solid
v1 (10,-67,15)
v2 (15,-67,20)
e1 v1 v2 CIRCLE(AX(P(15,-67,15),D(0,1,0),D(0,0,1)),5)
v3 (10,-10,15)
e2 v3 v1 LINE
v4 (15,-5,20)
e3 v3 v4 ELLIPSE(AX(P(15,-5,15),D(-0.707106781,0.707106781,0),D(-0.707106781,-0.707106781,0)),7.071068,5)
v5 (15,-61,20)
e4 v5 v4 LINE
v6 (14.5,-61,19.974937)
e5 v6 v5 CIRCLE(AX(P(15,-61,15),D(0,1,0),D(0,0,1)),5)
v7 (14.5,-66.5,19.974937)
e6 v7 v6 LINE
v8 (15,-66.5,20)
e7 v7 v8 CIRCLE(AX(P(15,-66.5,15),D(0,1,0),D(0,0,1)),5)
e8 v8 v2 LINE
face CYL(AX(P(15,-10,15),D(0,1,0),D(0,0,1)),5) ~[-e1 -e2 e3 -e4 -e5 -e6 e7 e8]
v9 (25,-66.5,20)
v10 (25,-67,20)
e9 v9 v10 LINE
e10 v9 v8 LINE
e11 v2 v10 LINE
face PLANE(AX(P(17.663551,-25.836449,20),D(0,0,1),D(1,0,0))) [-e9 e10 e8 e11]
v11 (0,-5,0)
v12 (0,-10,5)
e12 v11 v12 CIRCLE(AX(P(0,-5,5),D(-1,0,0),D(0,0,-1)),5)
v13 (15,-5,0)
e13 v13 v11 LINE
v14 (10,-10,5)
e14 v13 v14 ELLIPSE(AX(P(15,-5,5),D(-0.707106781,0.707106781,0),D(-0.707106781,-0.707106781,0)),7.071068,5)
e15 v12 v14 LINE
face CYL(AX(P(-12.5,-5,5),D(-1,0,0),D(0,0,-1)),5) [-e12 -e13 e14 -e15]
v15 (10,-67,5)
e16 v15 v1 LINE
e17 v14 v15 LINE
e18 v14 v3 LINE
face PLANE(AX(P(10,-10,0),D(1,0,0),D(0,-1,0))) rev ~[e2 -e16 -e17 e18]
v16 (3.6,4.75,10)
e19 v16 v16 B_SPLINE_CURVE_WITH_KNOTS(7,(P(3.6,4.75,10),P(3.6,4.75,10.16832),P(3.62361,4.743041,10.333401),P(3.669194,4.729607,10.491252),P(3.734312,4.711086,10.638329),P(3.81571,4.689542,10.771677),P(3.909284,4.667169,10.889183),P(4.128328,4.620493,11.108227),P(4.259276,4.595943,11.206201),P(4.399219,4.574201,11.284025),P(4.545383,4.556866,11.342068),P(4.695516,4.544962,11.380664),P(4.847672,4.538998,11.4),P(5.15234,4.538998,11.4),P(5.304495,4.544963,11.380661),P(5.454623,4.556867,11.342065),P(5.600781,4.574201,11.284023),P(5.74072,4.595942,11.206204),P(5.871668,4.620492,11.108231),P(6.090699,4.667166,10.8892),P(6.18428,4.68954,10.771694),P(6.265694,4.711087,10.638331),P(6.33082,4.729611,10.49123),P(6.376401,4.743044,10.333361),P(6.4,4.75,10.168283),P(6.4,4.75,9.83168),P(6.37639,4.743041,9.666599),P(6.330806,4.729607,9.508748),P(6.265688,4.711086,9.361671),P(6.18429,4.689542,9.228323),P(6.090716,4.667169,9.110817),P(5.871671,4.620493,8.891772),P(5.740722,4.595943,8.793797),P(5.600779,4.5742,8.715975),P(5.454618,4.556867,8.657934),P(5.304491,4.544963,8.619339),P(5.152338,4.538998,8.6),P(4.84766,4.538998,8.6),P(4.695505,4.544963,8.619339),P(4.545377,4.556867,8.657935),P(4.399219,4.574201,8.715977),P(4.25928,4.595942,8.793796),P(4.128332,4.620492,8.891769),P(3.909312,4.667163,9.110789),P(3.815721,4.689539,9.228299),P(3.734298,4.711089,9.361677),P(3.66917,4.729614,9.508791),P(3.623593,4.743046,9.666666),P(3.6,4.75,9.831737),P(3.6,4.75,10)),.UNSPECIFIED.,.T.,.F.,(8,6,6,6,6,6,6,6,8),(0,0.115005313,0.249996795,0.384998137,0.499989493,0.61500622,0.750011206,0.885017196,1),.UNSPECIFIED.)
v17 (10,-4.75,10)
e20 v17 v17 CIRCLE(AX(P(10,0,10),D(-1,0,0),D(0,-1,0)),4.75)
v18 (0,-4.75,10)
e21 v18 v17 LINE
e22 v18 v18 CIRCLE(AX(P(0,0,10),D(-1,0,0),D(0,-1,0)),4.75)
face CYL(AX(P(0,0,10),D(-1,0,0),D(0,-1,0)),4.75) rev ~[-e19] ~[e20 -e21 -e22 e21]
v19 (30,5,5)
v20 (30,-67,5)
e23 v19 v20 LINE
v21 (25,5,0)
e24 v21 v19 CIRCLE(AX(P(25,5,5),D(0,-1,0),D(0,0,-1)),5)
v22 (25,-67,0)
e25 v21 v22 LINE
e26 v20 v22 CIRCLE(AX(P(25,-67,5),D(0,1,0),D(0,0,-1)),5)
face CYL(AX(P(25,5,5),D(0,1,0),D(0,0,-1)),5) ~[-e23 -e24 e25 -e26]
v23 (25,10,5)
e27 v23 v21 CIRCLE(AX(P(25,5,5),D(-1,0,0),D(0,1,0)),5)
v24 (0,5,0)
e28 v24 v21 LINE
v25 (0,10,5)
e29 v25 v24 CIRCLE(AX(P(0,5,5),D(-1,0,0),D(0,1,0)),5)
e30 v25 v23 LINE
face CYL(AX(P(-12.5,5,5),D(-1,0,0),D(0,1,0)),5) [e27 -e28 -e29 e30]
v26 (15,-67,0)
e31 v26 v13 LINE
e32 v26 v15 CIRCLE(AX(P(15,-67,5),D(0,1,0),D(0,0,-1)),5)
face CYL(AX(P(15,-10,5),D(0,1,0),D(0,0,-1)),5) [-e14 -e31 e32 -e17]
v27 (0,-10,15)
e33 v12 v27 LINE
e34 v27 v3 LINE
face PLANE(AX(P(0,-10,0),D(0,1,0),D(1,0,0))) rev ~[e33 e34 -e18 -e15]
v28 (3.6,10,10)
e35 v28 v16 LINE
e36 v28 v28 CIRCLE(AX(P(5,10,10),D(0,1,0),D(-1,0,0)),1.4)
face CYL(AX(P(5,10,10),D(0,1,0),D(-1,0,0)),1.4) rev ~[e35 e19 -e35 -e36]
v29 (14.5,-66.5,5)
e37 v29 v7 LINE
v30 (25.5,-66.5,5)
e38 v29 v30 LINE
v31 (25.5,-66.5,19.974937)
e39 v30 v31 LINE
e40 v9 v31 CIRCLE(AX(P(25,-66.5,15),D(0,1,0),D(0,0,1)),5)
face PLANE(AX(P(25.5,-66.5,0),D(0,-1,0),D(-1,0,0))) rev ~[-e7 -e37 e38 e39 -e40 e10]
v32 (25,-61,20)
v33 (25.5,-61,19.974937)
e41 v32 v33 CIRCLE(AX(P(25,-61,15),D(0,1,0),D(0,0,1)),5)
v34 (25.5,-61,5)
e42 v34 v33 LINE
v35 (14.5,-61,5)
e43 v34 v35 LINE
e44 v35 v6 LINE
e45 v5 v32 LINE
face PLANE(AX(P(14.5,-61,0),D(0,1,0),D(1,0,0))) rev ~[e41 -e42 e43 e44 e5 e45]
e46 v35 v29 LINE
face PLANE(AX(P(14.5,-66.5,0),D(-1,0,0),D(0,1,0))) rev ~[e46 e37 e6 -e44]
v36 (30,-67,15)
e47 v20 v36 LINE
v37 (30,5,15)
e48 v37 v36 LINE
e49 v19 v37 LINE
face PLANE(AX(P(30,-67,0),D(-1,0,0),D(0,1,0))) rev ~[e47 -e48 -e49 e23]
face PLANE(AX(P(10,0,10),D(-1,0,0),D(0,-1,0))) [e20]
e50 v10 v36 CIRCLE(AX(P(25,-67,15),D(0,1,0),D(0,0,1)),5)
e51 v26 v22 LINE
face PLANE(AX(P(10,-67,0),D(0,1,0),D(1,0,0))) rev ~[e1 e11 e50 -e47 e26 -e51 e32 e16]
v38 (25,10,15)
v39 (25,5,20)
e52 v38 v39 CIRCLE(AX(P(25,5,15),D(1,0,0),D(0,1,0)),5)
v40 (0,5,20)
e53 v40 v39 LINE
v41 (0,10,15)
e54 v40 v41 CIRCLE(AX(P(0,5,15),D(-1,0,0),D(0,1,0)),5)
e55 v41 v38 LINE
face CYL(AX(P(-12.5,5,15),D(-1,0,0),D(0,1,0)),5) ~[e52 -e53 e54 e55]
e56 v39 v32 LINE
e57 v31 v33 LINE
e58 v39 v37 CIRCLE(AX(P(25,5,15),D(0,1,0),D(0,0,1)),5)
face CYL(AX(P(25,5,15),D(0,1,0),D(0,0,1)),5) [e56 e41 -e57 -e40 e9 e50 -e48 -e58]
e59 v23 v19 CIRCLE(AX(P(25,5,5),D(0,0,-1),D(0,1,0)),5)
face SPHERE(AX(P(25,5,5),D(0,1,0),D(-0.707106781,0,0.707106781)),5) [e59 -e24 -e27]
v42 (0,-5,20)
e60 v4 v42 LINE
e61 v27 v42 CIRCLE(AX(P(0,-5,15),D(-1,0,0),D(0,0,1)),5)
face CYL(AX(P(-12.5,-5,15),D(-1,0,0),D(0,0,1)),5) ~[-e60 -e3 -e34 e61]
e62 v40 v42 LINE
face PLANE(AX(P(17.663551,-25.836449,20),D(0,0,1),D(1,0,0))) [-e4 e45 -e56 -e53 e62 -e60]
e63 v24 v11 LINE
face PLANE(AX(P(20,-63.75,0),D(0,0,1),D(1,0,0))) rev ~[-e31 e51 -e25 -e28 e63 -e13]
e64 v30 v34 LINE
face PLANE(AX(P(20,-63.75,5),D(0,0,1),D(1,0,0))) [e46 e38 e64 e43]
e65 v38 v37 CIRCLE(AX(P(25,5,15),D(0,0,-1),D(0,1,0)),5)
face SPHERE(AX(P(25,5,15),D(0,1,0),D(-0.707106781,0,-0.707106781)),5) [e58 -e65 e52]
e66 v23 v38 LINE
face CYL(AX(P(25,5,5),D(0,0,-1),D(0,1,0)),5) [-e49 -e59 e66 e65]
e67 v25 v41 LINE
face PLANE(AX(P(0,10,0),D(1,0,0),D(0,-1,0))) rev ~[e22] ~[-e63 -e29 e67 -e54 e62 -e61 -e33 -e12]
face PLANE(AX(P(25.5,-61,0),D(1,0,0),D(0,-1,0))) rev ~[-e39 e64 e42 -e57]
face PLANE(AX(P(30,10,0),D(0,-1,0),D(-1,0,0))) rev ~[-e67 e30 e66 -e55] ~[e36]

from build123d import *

# Parameters (mm, degrees)
F1_DEPTH     = 20
F2_DEPTH     = 5
F3_R         = 4.75
F4_DEPTH     = 10
F5_R         = 1.4
F6_DEPTH     = 5.4620024133
F7_T1_DEPTH  = 37.5
F7_T3_DEPTH  = 22.5
F7_T5_DEPTH  = 69.5
F7_T7_DEPTH  = 84.5
F7_T9_DEPTH  = 10
F7_S13_W     = 5
F7_S13_H     = 5
F7_T14_DEPTH = 5
F7_S19_W     = 5
F7_S19_H     = 5
F7_T20_DEPTH = 5
F7_T27_DEPTH = 35
F7_T31_DEPTH = 82
F7_T38_DEPTH = 35
F7_T42_DEPTH = 82


# Not quite as in the source:
# - a fillet or chamfer that OpenCascade refuses, or shapes differently, is made with other operations: its cross-section is extruded or revolved along the edge and cut away or added


with BuildPart() as f1:
    # F0 (on Top) → F1 (new body)
    with BuildSketch(Plane.XY):
        Polygon((0, 10), (0, 0), (0, -10), (10, -10), (10, -67), (30, -67), (30, 10), align=None)
        Polygon((25.5, -61), (25.5, -66.5), (20, -66.5), (14.5, -66.5), (14.5, -61), align=None, mode=Mode.SUBTRACT)
    extrude(amount=F1_DEPTH)

    # F0 (on Top) → F2 (join)
    with BuildSketch(Plane.XY):
        Polygon((20, -66.5), (25.5, -66.5), (25.5, -61), (14.5, -61), (14.5, -66.5), align=None)
    extrude(amount=F2_DEPTH)

    # F3 (on face) → F4 (cut)
    with BuildSketch(Plane(origin=(0, 0, 0), x_dir=(0, -1, 0), z_dir=(-1, 0, 0))):
        with Locations((0, 10)):
            Circle(F3_R)
    extrude(amount=-F4_DEPTH, mode=Mode.SUBTRACT)

    # F5 (on face) → F6 (cut, through all)
    with BuildSketch(Plane(origin=(0, 10, 0), x_dir=(-1, 0, 0), z_dir=(0, 1, 0))):
        with Locations((-5, 10)):
            Circle(F5_R)
    extrude(amount=-F6_DEPTH, mode=Mode.SUBTRACT)

    # F7: fillet of radius 5 on 9 edges, made by hand

    # F7_s2 → F7_t1 (cut)
    with BuildSketch(Plane.YZ.offset(-12.5)):
        with BuildLine():
            ThreePointArc((10, 15), (8.5355339059, 18.5355339059), (5, 20))
            Line((5, 20), (10, 20))
            Line((10, 20), (10, 15))
        make_face()
        with BuildLine():
            ThreePointArc((10, 5), (8.5355339059, 1.4644660941), (5, 0))
            Line((5, 0), (10, 0))
            Line((10, 0), (10, 5))
        make_face()
    extrude(amount=F7_T1_DEPTH, mode=Mode.SUBTRACT)

    # F7_s4 → F7_t3 (cut)
    with BuildSketch(Plane.YZ.offset(-12.5)):
        with BuildLine():
            ThreePointArc((-5, 20), (-8.5355339059, 18.5355339059), (-10, 15))
            Line((-10, 15), (-10, 20))
            Line((-10, 20), (-5, 20))
        make_face()
        with BuildLine():
            ThreePointArc((-5, 0), (-8.5355339059, 1.4644660941), (-10, 5))
            Line((-10, 5), (-10, 0))
            Line((-10, 0), (-5, 0))
        make_face()
    extrude(amount=F7_T3_DEPTH, mode=Mode.SUBTRACT)

    # F7_s6 → F7_t5 (cut)
    with BuildSketch(Plane.XZ.offset(10)):
        with BuildLine():
            ThreePointArc((15, 20), (11.4644660941, 18.5355339059), (10, 15))
            Line((10, 15), (10, 20))
            Line((10, 20), (15, 20))
        make_face()
        with BuildLine():
            ThreePointArc((15, 0), (11.4644660941, 1.4644660941), (10, 5))
            Line((10, 5), (10, 0))
            Line((10, 0), (15, 0))
        make_face()
    extrude(amount=F7_T5_DEPTH, mode=Mode.SUBTRACT)

    # F7_s8 → F7_t7 (cut)
    with BuildSketch(Plane.XZ.offset(-5)):
        with BuildLine():
            ThreePointArc((25, 20), (28.5355339059, 18.5355339059), (30, 15))
            Line((30, 15), (30, 20))
            Line((30, 20), (25, 20))
        make_face()
        with BuildLine():
            ThreePointArc((25, 0), (28.5355339059, 1.4644660941), (30, 5))
            Line((30, 5), (30, 0))
            Line((30, 0), (25, 0))
        make_face()
    extrude(amount=F7_T7_DEPTH, mode=Mode.SUBTRACT)

    # F7_s10 → F7_t9 (cut)
    with BuildSketch(Plane.XY.offset(5)):
        with BuildLine():
            ThreePointArc((25, 10), (28.5355339059, 8.5355339059), (30, 5))
            Line((30, 5), (30, 10))
            Line((30, 10), (25, 10))
        make_face()
    extrude(amount=F7_T9_DEPTH, mode=Mode.SUBTRACT)


with BuildPart() as f7_tool12:
    # F7_s13 → F7_t14 (new body)
    with BuildSketch(Plane.XZ.offset(-5)):
        with Locations((27.5, 17.5)):
            Rectangle(F7_S13_W, F7_S13_H)
    extrude(amount=-F7_T14_DEPTH)

    # F7_s15 → F7_t16 (revolve, cut)
    with BuildSketch(Plane(origin=(25, 5, 15), x_dir=(-0.7071067812, 0, -0.7071067812), z_dir=(0.7071067812, 0, -0.7071067812))):
        with BuildLine():
            ThreePointArc((0, -5), (5, 0), (0, 5))
            Line((0, 5), (0, -5))
        make_face()
    revolve(axis=Axis((25, 5, 15), (0, 1, 0)), mode=Mode.SUBTRACT)


with BuildPart() as f1_1:
    add(f1.part)

    # F7_t11: cut F7_tool12
    add(f7_tool12.part, mode=Mode.SUBTRACT)


with BuildPart() as f7_tool18:
    # F7_s19 → F7_t20 (new body)
    with BuildSketch(Plane.XZ.offset(-5)):
        with Locations((27.5, 2.5)):
            Rectangle(F7_S19_W, F7_S19_H)
    extrude(amount=-F7_T20_DEPTH)

    # F7_s21 → F7_t22 (revolve, cut)
    with BuildSketch(Plane(origin=(25, 5, 5), x_dir=(-0.7071067812, 0, 0.7071067812), z_dir=(-0.7071067812, 0, -0.7071067812))):
        with BuildLine():
            ThreePointArc((0, -5), (5, 0), (0, 5))
            Line((0, 5), (0, -5))
        make_face()
    revolve(axis=Axis((25, 5, 5), (0, 1, 0)), mode=Mode.SUBTRACT)


with BuildPart() as f1_2:
    add(f1_1.part)

    # F7_t17: cut F7_tool18
    add(f7_tool18.part, mode=Mode.SUBTRACT)


with BuildPart() as f7_tool25:
    # F7_s26 → F7_t27 (new body)
    with BuildSketch(Plane.YZ.offset(-12.5)):
        with BuildLine():
            ThreePointArc((-5, 20), (-8.5355339059, 18.5355339059), (-10, 15))
            Line((-10, 15), (-10, 20))
            Line((-10, 20), (-5, 20))
        make_face()
    extrude(amount=F7_T27_DEPTH)

    split(bisect_by=Plane.YZ.offset(10), keep=Keep.TOP)


with BuildPart() as f7_tool29:
    # F7_s30 → F7_t31 (new body)
    with BuildSketch(Plane.XZ.offset(-2.5)):
        with BuildLine():
            ThreePointArc((15, 20), (11.4644660941, 18.5355339059), (10, 15))
            Line((10, 15), (10, 20))
            Line((10, 20), (15, 20))
        make_face()
    extrude(amount=F7_T31_DEPTH)

    split(bisect_by=Plane.XZ.offset(10), keep=Keep.BOTTOM)


with BuildPart() as f7_tool25_1:
    add(f7_tool25.part)

    # F7_t33: intersect F7_tool29
    add(f7_tool29.part, mode=Mode.INTERSECT)


with BuildPart() as f1_3:
    add(f1_2.part)

    # F7_t23: cut F7_tool25
    add(f7_tool25_1.part, mode=Mode.SUBTRACT)


with BuildPart() as f7_tool36:
    # F7_s37 → F7_t38 (new body)
    with BuildSketch(Plane.YZ.offset(-12.5)):
        with BuildLine():
            ThreePointArc((-5, 0), (-8.5355339059, 1.4644660941), (-10, 5))
            Line((-10, 5), (-10, 0))
            Line((-10, 0), (-5, 0))
        make_face()
    extrude(amount=F7_T38_DEPTH)

    split(bisect_by=Plane.YZ.offset(10), keep=Keep.TOP)


with BuildPart() as f7_tool40:
    # F7_s41 → F7_t42 (new body)
    with BuildSketch(Plane.XZ.offset(-2.5)):
        with BuildLine():
            ThreePointArc((15, 0), (11.4644660941, 1.4644660941), (10, 5))
            Line((10, 5), (10, 0))
            Line((10, 0), (15, 0))
        make_face()
    extrude(amount=F7_T42_DEPTH)

    split(bisect_by=Plane.XZ.offset(10), keep=Keep.BOTTOM)


with BuildPart() as f7_tool36_1:
    add(f7_tool36.part)

    # F7_t44: intersect F7_tool40
    add(f7_tool40.part, mode=Mode.INTERSECT)


with BuildPart() as f1_4:
    add(f1_3.part)

    # F7_t34: cut F7_tool36
    add(f7_tool36_1.part, mode=Mode.SUBTRACT)


solid = f1_4.part
